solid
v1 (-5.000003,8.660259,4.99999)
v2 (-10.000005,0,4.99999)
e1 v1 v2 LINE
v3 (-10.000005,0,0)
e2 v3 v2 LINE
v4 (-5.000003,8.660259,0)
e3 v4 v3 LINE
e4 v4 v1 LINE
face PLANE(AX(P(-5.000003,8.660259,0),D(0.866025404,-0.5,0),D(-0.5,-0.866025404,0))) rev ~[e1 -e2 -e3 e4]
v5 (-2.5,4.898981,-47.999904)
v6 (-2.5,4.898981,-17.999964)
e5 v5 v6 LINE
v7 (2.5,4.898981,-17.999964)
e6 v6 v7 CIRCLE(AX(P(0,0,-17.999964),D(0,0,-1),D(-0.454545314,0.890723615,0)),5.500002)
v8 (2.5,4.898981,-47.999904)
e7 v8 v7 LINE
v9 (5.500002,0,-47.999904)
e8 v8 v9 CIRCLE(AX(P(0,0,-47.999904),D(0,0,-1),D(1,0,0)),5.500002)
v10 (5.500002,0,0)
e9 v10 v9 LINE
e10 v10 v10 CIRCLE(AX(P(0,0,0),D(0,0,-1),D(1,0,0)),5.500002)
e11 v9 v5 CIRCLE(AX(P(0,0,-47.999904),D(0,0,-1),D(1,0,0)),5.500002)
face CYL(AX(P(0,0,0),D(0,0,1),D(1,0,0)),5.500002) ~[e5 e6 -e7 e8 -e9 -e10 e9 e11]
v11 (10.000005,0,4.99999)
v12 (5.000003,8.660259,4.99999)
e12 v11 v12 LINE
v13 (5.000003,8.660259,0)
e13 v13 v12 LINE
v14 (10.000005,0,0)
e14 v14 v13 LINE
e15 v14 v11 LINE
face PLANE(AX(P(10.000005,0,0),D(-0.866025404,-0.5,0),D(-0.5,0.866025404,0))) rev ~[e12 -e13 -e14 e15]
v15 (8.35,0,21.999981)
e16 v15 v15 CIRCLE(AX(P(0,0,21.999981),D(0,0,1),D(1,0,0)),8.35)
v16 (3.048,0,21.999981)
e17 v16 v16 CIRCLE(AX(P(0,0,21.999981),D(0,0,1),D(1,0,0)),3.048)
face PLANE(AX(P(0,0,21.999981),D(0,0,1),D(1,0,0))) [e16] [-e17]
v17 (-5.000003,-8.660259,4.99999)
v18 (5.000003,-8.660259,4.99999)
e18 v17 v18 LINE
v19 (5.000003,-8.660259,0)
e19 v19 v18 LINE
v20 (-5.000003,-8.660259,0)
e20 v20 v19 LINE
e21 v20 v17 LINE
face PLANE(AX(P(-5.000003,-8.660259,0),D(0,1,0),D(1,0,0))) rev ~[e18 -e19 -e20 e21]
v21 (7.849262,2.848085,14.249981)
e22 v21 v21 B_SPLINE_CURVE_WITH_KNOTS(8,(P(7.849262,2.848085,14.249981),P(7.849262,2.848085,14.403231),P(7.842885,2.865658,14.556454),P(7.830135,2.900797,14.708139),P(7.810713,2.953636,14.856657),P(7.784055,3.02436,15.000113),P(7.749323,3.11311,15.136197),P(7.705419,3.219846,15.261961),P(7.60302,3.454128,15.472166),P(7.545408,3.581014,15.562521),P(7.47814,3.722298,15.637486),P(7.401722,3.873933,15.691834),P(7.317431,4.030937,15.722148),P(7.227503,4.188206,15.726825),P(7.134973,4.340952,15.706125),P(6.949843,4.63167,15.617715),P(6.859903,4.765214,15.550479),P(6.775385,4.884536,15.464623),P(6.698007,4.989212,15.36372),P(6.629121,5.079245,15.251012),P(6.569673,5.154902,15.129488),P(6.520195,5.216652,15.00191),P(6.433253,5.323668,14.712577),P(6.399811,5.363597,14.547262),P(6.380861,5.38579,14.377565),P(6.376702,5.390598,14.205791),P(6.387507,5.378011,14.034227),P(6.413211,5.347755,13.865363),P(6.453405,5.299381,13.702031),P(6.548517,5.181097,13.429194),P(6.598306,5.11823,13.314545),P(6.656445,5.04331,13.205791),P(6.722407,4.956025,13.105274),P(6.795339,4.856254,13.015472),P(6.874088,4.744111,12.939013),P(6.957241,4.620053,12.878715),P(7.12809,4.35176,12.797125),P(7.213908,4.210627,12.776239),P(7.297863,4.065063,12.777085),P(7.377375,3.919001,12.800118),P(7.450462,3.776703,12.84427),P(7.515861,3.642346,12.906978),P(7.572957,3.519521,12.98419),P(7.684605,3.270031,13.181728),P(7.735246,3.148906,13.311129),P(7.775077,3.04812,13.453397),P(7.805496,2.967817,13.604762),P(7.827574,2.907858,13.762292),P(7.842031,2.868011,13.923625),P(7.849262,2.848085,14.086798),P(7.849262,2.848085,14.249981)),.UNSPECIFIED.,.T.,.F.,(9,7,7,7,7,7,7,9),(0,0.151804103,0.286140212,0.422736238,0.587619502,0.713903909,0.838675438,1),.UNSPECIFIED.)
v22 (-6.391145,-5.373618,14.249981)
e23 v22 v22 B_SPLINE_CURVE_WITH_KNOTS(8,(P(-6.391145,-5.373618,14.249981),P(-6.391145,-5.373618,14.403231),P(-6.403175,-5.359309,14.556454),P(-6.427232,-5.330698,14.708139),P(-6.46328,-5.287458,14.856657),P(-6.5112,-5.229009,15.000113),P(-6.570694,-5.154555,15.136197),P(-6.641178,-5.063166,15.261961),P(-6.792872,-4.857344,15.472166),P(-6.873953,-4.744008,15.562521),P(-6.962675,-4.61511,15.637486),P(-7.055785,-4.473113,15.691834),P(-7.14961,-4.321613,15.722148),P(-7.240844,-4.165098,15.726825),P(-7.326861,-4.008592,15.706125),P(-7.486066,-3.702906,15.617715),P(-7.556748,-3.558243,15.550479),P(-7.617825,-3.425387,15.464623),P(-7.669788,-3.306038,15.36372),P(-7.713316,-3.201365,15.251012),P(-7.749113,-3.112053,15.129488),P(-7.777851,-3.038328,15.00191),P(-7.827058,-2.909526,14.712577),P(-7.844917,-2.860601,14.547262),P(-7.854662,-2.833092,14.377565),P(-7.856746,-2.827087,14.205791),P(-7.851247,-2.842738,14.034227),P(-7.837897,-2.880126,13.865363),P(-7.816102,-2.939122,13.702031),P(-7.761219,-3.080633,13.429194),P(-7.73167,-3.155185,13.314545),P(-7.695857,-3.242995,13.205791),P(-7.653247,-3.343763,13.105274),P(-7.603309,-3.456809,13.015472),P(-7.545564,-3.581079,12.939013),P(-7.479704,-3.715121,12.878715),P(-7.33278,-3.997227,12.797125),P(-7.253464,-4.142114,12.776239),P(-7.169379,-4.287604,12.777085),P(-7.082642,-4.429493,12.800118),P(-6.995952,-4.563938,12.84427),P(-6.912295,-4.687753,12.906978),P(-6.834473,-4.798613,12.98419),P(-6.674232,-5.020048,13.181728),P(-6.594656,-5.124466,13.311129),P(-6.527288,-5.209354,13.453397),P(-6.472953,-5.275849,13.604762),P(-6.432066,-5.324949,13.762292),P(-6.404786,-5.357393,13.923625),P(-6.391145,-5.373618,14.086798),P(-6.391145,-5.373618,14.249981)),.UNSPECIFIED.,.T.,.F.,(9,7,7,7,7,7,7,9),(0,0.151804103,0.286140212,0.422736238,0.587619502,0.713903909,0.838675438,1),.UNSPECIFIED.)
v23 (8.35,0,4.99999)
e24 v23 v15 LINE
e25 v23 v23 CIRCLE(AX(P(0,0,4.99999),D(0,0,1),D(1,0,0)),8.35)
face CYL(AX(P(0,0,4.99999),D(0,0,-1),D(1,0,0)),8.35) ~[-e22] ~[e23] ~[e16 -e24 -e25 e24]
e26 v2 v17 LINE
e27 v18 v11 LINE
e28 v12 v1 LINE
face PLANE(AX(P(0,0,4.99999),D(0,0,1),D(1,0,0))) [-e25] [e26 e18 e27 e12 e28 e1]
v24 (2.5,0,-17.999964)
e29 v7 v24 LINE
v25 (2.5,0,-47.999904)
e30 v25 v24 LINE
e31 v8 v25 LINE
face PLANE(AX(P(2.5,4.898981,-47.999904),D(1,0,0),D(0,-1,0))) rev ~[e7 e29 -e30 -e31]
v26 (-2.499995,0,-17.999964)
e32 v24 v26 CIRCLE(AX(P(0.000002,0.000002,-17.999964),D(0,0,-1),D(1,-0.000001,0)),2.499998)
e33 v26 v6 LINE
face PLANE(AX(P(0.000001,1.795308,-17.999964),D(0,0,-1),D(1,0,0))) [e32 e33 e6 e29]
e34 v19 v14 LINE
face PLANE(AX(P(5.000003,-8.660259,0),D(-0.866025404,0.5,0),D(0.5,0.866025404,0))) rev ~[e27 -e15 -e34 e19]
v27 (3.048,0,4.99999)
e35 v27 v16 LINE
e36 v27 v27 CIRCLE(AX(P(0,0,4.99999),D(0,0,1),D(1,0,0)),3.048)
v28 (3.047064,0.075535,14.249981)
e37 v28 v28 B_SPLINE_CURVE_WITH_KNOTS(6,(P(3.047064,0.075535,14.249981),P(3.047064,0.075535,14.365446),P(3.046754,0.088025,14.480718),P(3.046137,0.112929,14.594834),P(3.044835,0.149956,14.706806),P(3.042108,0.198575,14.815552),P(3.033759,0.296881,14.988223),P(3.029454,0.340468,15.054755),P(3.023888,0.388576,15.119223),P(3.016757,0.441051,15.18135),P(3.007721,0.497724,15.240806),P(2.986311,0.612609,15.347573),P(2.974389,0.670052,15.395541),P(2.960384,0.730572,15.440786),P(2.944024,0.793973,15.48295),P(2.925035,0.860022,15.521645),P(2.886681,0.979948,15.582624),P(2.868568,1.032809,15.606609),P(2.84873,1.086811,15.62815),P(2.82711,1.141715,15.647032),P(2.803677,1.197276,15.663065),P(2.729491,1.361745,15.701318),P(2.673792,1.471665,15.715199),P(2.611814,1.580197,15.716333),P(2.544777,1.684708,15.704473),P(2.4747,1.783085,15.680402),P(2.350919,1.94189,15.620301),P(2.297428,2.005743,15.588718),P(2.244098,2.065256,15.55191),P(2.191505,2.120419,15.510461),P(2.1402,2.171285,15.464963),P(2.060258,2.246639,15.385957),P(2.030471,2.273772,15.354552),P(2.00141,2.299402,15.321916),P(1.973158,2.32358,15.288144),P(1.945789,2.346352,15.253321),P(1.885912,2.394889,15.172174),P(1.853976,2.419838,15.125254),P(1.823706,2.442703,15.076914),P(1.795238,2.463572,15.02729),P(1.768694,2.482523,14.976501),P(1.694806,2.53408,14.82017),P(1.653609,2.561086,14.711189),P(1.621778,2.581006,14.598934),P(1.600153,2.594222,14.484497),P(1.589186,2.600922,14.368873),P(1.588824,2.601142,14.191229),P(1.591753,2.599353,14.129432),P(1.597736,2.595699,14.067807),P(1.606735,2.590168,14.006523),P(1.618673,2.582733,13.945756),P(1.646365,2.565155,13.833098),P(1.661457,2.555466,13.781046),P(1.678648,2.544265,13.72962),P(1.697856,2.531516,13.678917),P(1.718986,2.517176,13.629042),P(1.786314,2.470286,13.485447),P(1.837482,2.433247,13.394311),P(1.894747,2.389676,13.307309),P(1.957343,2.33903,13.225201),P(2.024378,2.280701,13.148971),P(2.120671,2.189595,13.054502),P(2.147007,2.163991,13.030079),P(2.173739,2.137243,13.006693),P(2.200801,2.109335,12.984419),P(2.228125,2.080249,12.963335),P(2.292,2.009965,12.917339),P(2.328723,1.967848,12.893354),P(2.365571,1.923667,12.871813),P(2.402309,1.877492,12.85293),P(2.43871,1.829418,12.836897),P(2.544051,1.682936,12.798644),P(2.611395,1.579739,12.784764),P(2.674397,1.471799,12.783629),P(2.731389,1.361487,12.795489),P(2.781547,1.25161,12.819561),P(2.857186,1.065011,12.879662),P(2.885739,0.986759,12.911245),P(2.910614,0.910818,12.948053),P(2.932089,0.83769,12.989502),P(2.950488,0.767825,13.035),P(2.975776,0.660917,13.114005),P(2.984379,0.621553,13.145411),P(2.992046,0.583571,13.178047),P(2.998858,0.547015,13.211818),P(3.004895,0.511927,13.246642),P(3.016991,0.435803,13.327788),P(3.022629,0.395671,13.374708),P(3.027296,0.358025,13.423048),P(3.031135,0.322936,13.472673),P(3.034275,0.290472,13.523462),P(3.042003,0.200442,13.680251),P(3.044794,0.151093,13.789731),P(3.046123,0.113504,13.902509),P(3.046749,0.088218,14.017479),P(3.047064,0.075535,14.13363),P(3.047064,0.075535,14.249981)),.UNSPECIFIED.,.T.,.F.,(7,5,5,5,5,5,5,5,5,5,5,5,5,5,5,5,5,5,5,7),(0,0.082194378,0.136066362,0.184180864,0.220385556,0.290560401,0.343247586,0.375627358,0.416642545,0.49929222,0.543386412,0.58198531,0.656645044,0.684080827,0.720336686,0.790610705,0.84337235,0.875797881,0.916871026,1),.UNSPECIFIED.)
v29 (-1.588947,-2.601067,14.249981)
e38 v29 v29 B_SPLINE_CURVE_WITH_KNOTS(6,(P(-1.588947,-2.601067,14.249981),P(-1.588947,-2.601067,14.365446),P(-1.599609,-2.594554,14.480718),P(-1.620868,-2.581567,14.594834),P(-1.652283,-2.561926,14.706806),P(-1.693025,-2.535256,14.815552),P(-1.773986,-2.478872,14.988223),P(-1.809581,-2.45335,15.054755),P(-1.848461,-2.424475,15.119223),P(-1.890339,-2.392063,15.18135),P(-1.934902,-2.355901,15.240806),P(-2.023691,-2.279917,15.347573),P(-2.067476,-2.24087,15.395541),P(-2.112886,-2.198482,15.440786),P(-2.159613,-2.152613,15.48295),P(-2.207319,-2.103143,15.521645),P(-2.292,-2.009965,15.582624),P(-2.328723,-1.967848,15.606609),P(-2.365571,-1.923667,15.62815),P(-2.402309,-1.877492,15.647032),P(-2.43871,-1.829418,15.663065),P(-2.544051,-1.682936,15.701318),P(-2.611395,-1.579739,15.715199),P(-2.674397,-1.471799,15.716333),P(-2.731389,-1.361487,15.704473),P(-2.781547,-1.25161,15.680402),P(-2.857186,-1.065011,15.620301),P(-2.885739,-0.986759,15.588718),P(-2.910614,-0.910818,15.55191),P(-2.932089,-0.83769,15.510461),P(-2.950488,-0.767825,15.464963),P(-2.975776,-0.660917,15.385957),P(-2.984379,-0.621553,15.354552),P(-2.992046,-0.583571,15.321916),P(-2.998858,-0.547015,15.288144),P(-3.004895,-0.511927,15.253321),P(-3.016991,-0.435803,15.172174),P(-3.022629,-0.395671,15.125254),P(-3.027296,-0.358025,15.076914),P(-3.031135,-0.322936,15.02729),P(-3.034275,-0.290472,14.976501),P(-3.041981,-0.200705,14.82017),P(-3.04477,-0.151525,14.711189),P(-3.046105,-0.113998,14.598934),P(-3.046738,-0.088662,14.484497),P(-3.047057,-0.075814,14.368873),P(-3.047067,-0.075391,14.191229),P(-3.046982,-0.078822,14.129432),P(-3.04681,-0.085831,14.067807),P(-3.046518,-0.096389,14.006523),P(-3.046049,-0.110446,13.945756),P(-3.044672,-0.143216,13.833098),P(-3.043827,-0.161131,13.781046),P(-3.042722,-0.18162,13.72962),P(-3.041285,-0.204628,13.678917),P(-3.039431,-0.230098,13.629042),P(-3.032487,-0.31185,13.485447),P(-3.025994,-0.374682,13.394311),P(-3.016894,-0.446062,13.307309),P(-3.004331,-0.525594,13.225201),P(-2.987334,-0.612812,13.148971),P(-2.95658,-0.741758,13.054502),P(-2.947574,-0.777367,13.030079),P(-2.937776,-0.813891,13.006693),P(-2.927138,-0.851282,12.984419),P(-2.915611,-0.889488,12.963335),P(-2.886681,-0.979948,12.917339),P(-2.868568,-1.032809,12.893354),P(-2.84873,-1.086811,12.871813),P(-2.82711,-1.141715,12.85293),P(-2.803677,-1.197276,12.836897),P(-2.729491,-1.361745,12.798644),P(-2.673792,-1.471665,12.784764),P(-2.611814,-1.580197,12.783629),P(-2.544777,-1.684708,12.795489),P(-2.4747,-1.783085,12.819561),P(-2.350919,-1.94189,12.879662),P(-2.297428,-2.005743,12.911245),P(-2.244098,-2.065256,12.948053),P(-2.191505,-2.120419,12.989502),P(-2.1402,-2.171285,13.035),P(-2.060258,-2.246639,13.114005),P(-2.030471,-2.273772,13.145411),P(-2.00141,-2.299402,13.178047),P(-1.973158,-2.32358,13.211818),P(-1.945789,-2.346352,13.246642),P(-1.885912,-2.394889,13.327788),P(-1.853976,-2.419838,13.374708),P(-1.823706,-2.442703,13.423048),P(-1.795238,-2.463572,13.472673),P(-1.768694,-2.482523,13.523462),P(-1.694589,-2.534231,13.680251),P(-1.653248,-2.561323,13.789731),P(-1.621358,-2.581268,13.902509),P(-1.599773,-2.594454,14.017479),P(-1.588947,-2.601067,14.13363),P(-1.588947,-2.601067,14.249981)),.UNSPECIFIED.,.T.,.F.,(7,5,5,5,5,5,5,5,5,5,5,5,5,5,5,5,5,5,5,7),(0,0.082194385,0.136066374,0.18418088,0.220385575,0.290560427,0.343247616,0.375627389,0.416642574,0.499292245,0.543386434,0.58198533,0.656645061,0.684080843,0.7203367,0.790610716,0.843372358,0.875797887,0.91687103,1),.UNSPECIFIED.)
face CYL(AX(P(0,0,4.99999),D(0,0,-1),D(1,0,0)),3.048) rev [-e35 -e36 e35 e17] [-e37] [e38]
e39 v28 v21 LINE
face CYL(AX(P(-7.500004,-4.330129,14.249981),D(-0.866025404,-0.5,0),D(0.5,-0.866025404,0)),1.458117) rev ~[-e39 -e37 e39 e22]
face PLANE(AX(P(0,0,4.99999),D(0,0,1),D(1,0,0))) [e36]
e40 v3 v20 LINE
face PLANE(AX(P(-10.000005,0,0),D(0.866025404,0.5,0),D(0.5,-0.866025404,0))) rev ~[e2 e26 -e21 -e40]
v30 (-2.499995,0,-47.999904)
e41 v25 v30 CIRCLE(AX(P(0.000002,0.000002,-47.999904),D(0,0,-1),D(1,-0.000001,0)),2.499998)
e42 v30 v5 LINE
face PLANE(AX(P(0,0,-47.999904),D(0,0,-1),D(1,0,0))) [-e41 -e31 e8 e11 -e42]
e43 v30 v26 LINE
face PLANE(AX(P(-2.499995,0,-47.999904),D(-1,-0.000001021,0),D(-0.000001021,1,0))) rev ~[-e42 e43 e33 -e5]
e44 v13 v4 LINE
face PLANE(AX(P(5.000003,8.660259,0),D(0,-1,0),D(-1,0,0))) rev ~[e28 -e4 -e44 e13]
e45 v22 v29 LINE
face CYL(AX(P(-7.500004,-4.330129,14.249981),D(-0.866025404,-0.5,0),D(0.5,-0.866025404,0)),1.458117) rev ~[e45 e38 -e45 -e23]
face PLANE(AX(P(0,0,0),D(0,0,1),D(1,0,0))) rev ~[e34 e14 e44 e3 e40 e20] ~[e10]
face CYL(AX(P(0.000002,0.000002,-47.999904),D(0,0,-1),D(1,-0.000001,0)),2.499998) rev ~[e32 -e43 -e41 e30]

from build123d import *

# Parameters (mm, degrees)
F1_DEPTH = 4.99999
F2_R     = 8.34999981
F2_R_2   = 3.048
F3_DEPTH = 16.9999914
F4_R     = 1.4581169527
F5_DEPTH = 25.4
F6_R     = 5.5000017
F7_DEPTH = 47.999904
F9_DEPTH = 29.99994


# Not quite as in the source:
# - ends of sketch curves that miss each other by under 0.0002 mm in the source are joined


with BuildPart() as f1:
    # F0 (on Top) → F1 (new body)
    with BuildSketch(Plane.XY):
        Polygon((10.0000054, 0), (5.0000027, 8.6602587144), (-5.0000027, 8.6602587144), (-10.0000054, 0), (-5.0000027, -8.6602587144), (5.0000027, -8.6602587144), align=None)
    extrude(amount=F1_DEPTH)

    # F2 (on face) → F3 (join)
    with BuildSketch(Plane.XY.offset(4.99999)):
        Circle(F2_R)
        Circle(F2_R_2, mode=Mode.SUBTRACT)
    extrude(amount=F3_DEPTH)

    # F4 (on face) → F5 (cut)
    with BuildSketch(Plane(origin=(-7.50000405, -4.3301293572, 0), x_dir=(0.5, -0.8660254038, 0), z_dir=(-0.8660254038, -0.5, 0))):
        with Locations((0, 14.2499814)):
            Circle(F4_R)
    extrude(amount=-F5_DEPTH, mode=Mode.SUBTRACT)

    # F6 (on face) → F7 (join)
    with BuildSketch(Plane(origin=(0, 0, 0), x_dir=(1, 0, 0), z_dir=(0, 0, -1))):
        Circle(F6_R)
    extrude(amount=F7_DEPTH)

    # F8 (on face) → F9 (cut)
    with BuildSketch(Plane(origin=(0, 0, -47.999904), x_dir=(1, 0, 0), z_dir=(0, 0, -1))):
        with BuildLine():
            Line((2.5, -4.8989813941), (2.5, 0))
            ThreePointArc((2.5, 0), (0, 2.499995), (-2.499995, 0))
            Line((-2.499995, 0), (-2.5, -4.8989813941))
            ThreePointArc((-2.5, -4.8989813941), (0, -5.5000017), (2.5, -4.8989813941))
        make_face()
    extrude(amount=-F9_DEPTH, mode=Mode.SUBTRACT)


solid = f1.part
